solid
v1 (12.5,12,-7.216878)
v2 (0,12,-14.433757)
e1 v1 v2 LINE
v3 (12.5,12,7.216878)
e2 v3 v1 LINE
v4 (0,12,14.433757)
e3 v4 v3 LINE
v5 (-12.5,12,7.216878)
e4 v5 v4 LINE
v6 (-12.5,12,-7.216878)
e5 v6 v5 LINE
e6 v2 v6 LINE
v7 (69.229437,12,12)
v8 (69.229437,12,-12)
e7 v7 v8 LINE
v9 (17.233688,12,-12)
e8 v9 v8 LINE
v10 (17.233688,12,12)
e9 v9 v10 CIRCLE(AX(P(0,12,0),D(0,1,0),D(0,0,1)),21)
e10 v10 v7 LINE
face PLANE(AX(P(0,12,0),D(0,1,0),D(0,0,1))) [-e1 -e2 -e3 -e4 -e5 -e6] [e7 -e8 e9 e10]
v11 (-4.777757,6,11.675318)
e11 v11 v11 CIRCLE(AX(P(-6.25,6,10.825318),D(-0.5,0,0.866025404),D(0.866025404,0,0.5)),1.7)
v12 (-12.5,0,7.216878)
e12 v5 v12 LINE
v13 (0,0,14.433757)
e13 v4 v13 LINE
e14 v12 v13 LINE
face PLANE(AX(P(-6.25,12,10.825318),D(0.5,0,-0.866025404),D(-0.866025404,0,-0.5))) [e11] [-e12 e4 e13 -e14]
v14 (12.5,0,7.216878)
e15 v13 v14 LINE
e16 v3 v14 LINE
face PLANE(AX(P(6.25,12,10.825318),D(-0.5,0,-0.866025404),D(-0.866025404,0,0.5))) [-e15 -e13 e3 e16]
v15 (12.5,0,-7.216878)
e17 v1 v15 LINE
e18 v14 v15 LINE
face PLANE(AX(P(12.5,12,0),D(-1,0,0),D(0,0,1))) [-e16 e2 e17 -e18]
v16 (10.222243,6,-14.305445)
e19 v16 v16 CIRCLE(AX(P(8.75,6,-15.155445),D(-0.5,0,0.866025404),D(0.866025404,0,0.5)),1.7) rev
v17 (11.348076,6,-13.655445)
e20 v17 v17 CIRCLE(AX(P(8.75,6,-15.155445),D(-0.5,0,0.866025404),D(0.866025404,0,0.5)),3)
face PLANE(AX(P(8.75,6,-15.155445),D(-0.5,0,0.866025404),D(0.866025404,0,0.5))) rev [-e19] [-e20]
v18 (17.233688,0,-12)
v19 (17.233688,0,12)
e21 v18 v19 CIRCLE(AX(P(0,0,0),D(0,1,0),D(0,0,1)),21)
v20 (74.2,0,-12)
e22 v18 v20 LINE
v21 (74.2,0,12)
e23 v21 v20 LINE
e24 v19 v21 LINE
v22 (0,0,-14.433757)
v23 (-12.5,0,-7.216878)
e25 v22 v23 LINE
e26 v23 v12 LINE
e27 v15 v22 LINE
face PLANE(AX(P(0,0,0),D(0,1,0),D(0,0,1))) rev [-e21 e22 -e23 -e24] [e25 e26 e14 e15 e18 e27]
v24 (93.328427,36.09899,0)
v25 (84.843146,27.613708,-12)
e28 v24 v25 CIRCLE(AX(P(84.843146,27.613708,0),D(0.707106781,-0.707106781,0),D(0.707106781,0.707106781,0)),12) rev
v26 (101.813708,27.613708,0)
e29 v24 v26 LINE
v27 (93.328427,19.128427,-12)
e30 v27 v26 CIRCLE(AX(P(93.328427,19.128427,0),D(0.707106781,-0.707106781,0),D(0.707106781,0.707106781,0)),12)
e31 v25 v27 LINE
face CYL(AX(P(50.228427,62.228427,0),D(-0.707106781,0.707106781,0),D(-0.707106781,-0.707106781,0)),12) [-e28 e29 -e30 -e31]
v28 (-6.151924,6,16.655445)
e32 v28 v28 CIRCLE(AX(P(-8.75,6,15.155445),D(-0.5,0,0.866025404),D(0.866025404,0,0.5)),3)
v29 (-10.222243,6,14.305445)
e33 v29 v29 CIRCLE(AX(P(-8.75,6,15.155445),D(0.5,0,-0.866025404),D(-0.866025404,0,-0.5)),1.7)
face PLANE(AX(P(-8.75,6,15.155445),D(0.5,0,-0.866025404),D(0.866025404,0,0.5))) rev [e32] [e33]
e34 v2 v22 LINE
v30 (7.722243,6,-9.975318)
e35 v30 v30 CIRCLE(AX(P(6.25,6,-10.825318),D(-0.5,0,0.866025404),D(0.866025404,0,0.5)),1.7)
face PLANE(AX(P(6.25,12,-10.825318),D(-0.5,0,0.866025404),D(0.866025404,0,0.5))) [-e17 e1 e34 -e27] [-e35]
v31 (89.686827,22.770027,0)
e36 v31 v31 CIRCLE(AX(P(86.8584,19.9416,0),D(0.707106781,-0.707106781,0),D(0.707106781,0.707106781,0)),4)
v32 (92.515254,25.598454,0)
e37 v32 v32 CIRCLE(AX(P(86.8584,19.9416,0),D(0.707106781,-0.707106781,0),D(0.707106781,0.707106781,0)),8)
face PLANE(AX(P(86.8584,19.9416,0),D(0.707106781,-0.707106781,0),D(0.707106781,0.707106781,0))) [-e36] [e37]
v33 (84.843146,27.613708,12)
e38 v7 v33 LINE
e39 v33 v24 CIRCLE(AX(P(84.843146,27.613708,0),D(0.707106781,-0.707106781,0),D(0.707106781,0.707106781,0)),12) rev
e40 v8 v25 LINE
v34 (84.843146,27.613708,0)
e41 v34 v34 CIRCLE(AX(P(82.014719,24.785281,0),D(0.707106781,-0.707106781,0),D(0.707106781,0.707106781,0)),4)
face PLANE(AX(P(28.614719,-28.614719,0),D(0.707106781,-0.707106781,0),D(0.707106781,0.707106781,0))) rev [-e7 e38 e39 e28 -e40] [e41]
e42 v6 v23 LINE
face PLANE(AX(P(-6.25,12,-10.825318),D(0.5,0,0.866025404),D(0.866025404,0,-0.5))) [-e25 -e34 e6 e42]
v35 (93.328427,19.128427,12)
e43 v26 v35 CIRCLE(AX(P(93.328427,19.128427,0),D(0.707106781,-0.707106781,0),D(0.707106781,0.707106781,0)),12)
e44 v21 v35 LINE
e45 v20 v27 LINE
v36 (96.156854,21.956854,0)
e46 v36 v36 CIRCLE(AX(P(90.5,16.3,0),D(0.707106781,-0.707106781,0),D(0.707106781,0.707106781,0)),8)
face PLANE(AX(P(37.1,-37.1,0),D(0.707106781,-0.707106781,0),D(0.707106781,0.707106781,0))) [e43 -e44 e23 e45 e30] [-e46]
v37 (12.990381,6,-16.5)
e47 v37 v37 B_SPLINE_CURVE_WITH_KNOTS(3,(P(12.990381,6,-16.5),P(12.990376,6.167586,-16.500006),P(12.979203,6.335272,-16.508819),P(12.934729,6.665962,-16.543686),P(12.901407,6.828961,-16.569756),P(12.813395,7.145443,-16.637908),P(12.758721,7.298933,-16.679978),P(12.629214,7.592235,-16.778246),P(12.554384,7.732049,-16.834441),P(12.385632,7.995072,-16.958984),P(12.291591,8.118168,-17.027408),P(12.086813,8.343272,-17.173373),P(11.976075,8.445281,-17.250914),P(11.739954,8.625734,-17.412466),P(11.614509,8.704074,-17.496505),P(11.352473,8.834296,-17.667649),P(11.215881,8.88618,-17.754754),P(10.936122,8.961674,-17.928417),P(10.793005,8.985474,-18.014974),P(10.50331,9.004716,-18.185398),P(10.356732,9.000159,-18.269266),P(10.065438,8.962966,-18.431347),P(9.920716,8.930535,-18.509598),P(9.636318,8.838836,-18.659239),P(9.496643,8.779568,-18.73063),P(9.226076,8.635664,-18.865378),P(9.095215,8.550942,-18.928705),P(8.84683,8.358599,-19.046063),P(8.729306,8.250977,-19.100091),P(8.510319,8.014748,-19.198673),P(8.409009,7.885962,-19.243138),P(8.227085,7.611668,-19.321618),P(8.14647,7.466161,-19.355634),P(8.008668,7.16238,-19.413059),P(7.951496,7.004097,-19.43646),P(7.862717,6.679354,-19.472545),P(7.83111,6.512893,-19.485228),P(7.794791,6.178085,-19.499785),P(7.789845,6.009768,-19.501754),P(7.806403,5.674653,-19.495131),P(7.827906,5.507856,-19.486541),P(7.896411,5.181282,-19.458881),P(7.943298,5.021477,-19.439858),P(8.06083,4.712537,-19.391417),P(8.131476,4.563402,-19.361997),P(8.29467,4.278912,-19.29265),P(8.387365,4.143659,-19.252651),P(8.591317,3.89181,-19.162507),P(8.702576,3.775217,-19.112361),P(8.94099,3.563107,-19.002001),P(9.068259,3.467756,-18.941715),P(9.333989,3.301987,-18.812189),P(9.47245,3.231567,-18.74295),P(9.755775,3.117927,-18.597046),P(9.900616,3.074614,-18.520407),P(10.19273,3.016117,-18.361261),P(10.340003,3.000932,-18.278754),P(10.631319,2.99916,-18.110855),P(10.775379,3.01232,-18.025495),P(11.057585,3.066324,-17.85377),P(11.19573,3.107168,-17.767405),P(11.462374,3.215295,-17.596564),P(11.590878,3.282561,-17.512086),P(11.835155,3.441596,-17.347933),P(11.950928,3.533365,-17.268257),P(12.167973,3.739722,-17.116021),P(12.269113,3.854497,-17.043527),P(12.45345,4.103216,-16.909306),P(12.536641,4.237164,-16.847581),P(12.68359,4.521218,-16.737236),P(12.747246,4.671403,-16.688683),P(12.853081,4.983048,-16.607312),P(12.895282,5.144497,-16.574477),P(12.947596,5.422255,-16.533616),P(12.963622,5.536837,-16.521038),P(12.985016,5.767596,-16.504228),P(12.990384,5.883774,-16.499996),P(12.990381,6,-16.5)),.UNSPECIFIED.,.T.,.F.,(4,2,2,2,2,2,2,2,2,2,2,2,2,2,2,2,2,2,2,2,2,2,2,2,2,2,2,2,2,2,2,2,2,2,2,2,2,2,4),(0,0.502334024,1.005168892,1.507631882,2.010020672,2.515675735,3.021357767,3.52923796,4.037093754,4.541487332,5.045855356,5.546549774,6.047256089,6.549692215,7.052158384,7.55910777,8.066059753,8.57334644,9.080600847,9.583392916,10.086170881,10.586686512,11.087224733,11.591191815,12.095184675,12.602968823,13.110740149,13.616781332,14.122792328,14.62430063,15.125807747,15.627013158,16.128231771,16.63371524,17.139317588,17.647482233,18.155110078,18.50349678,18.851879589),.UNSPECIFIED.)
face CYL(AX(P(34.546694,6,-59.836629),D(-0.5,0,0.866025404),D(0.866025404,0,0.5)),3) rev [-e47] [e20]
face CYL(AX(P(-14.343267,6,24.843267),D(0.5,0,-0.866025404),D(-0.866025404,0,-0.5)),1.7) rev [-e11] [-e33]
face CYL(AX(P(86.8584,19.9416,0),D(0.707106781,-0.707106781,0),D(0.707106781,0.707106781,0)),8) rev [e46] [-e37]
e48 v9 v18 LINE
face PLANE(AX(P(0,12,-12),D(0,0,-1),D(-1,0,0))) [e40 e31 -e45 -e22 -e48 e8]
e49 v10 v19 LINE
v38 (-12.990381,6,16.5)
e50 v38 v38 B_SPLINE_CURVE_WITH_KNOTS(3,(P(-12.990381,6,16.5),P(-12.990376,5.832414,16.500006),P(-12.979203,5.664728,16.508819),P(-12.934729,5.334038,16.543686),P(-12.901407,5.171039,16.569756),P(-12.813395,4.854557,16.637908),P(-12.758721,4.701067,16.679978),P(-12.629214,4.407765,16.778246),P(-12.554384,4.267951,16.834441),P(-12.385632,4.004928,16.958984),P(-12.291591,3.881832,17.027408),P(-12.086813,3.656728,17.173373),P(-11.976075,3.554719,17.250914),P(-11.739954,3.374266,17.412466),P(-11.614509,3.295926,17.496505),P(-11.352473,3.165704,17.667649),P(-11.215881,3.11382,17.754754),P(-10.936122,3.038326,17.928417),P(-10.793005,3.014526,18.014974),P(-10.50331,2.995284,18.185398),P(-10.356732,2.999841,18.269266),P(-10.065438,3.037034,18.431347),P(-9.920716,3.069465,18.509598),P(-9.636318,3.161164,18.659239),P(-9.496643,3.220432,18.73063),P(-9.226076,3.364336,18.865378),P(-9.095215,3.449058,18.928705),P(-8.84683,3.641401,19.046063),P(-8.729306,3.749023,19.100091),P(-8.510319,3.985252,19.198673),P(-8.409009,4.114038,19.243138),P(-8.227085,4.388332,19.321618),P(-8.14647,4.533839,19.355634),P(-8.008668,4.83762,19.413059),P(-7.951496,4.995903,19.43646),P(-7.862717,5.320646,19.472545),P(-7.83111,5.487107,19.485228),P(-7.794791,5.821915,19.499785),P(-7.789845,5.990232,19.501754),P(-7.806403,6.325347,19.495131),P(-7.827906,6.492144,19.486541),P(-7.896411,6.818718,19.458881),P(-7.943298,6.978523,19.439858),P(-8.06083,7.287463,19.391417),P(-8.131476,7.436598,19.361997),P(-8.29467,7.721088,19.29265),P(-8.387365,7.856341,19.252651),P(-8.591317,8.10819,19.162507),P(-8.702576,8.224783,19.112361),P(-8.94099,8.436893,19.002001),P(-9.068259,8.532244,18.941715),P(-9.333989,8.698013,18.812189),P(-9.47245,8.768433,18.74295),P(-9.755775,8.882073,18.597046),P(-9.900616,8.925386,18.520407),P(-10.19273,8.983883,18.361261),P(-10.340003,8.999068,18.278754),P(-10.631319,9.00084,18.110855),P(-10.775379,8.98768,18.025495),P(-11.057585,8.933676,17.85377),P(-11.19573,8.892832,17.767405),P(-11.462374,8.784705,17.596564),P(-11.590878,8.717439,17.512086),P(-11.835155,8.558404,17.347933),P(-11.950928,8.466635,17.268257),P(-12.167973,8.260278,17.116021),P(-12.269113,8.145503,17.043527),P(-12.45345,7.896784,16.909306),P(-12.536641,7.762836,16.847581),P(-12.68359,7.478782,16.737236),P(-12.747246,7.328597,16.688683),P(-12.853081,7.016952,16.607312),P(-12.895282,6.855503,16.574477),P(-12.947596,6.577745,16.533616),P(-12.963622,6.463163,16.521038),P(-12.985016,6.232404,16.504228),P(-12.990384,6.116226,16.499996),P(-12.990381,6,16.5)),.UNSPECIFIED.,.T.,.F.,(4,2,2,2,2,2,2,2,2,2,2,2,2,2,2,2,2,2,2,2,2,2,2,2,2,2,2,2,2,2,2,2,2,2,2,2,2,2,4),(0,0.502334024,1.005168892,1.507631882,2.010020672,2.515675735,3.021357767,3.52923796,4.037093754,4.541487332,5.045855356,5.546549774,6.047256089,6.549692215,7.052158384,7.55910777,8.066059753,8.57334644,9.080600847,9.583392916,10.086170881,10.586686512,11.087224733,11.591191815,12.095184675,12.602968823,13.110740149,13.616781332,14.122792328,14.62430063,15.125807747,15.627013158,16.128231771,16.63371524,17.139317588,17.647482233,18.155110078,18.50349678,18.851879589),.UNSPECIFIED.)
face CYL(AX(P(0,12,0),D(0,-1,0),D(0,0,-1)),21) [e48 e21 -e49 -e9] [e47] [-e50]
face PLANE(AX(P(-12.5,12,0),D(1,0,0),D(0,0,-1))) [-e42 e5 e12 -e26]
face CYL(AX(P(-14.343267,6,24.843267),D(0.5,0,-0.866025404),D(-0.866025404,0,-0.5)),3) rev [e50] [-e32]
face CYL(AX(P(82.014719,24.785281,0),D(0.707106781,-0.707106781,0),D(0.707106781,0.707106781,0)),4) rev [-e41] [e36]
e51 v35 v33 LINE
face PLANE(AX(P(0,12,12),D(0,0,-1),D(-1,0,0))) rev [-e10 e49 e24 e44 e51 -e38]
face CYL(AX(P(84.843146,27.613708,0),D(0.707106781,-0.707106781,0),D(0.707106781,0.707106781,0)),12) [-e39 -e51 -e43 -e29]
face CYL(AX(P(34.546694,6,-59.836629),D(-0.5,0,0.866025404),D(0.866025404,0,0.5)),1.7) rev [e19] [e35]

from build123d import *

# Parameters (mm, degrees)
BOSS_EXTRUDE1_DEPTH = 12
SKETCH4_W           = 39.051681067
SKETCH4_H           = 24
SKETCH4_R           = 4
BOSS_EXTRUDE2_DEPTH = 12
SKETCH4_3_R         = 8
SKETCH4_3_R_2       = 4
CUT_EXTRUDE1_DEPTH  = 5.15
FILLET1_R           = 12
SKETCH5_R           = 1.7
CUT_EXTRUDE2_DEPTH  = 107.997244305
CUT_EXTRUDE3_START  = -5
SKETCH5_3_R         = 3
CUT_EXTRUDE3_DEPTH  = 102.997244335


with BuildPart() as part:
    # Sketch3 → Boss-Extrude1 (new body)
    with BuildSketch(Plane(origin=(0, 0, 0), x_dir=(1, 0, 0), z_dir=(0, 1, 0))):
        with BuildLine():
            Line((-4.215390309, -12), (-17.23368794, -12))
            ThreePointArc((-17.23368794, -12), (0, -21), (17.23368794, -12))
            Line((17.23368794, -12), (4.215390309, -12))
            Line((4.215390309, -12), (0, -14.43375673))
            Line((0, -14.43375673), (-4.215390309, -12))
        make_face()
        with BuildLine():
            Line((17.23368794, 12), (4.215390309, 12))
            Line((4.215390309, 12), (12.5, 7.216878365))
            Line((12.5, 7.216878365), (12.5, -7.216878365))
            Line((12.5, -7.216878365), (4.215390309, -12))
            Line((4.215390309, -12), (17.23368794, -12))
            ThreePointArc((17.23368794, -12), (20.036310124, -6.288583039), (21, 0))
            ThreePointArc((21, 0), (20.036310124, 6.288583039), (17.23368794, 12))
        make_face()
        with BuildLine():
            Line((-12.5, 7.216878365), (-4.215390309, 12))
            Line((-4.215390309, 12), (-17.23368794, 12))
            ThreePointArc((-17.23368794, 12), (-21, 0), (-17.23368794, -12))
            Line((-17.23368794, -12), (-4.215390309, -12))
            Line((-4.215390309, -12), (-12.5, -7.216878365))
            Line((-12.5, -7.216878365), (-12.5, 7.216878365))
        make_face()
        with BuildLine():
            Line((-4.215390309, 12), (0, 14.43375673))
            Line((0, 14.43375673), (4.215390309, 12))
            Line((4.215390309, 12), (17.23368794, 12))
            ThreePointArc((17.23368794, 12), (0, 21), (-17.23368794, 12))
            Line((-17.23368794, 12), (-4.215390309, 12))
        make_face()
        with BuildLine():
            Line((74.2, 12), (17.23368794, 12))
            ThreePointArc((17.23368794, 12), (20.036310124, 6.288583039), (21, 0))
            ThreePointArc((21, 0), (20.036310124, -6.288583039), (17.23368794, -12))
            Line((17.23368794, -12), (74.2, -12))
            Line((74.2, -12), (74.2, 12))
        make_face()
    extrude(amount=BOSS_EXTRUDE1_DEPTH)

    # Sketch4 → Boss-Extrude2 (add)
    with BuildSketch(Plane(origin=(37.1, -37.1, 0), x_dir=(0.7071067811865462, 0.7071067811865489, 0), z_dir=(0.7071067811865489, -0.7071067811865462, 0))):
        with Locations((71.993163698, 0)):
            Rectangle(SKETCH4_W, SKETCH4_H)
        with Locations((75.519004231, 0)):
            Circle(SKETCH4_R, mode=Mode.SUBTRACT)
    extrude(amount=-BOSS_EXTRUDE2_DEPTH)

    # Sketch4<3> → Cut-Extrude1 (cut)
    with BuildSketch(Plane(origin=(37.1, -37.1, 0), x_dir=(0.7071067811865462, 0.7071067811865489, 0), z_dir=(0.7071067811865489, -0.7071067811865462, 0))):
        with Locations((75.519004231, 0)):
            Circle(SKETCH4_3_R)
        with Locations((75.519004231, 0)):
            Circle(SKETCH4_3_R_2, mode=Mode.SUBTRACT)
    extrude(amount=-CUT_EXTRUDE1_DEPTH, mode=Mode.SUBTRACT)

    # Fillet1
    fillet1_edges = [part.edges().sort_by_distance(p)[0] for p in [
        (97.571067812, 31.856349186, -12),
        (97.571067812, 31.856349186, 12),
    ]]
    fillet(fillet1_edges, radius=FILLET1_R - 0.0001)  # a hair under: the kernel refuses the full size

    # Sketch5 → Cut-Extrude2 (cut, through all)
    with BuildSketch(Plane(origin=(6.25, 0, -10.825317547), x_dir=(0.8660254037844386, 0, 0.5), z_dir=(-0.5000000000000001, 0, 0.8660254037844387))):
        with Locations((0, 6)):
            Circle(SKETCH5_R)
    cut_extrude2 = extrude(amount=-CUT_EXTRUDE2_DEPTH, mode=Mode.SUBTRACT)

    # Sketch5<3> → Cut-Extrude3 (cut, through all)
    with BuildSketch(Plane(origin=(6.25, 0, -10.825317547), x_dir=(0.8660254037844386, 0, 0.5), z_dir=(-0.5000000000000001, 0, 0.8660254037844387)).offset(CUT_EXTRUDE3_START)):
        with Locations((0, 6)):
            Circle(SKETCH5_3_R)
    cut_extrude3 = extrude(amount=-CUT_EXTRUDE3_DEPTH, mode=Mode.SUBTRACT)

    # Mirror1: Cut-Extrude2, Cut-Extrude3 across plane
    add(cut_extrude2.mirror(Plane(origin=(0, 0, 0), x_dir=(0.8660254037844386, 0, 0.5000000000000002), z_dir=(-0.5, 0, 0.8660254037844386))), mode=Mode.SUBTRACT)
    add(cut_extrude3.mirror(Plane(origin=(0, 0, 0), x_dir=(0.8660254037844386, 0, 0.5000000000000002), z_dir=(-0.5, 0, 0.8660254037844386))), mode=Mode.SUBTRACT)


solid = part.part
